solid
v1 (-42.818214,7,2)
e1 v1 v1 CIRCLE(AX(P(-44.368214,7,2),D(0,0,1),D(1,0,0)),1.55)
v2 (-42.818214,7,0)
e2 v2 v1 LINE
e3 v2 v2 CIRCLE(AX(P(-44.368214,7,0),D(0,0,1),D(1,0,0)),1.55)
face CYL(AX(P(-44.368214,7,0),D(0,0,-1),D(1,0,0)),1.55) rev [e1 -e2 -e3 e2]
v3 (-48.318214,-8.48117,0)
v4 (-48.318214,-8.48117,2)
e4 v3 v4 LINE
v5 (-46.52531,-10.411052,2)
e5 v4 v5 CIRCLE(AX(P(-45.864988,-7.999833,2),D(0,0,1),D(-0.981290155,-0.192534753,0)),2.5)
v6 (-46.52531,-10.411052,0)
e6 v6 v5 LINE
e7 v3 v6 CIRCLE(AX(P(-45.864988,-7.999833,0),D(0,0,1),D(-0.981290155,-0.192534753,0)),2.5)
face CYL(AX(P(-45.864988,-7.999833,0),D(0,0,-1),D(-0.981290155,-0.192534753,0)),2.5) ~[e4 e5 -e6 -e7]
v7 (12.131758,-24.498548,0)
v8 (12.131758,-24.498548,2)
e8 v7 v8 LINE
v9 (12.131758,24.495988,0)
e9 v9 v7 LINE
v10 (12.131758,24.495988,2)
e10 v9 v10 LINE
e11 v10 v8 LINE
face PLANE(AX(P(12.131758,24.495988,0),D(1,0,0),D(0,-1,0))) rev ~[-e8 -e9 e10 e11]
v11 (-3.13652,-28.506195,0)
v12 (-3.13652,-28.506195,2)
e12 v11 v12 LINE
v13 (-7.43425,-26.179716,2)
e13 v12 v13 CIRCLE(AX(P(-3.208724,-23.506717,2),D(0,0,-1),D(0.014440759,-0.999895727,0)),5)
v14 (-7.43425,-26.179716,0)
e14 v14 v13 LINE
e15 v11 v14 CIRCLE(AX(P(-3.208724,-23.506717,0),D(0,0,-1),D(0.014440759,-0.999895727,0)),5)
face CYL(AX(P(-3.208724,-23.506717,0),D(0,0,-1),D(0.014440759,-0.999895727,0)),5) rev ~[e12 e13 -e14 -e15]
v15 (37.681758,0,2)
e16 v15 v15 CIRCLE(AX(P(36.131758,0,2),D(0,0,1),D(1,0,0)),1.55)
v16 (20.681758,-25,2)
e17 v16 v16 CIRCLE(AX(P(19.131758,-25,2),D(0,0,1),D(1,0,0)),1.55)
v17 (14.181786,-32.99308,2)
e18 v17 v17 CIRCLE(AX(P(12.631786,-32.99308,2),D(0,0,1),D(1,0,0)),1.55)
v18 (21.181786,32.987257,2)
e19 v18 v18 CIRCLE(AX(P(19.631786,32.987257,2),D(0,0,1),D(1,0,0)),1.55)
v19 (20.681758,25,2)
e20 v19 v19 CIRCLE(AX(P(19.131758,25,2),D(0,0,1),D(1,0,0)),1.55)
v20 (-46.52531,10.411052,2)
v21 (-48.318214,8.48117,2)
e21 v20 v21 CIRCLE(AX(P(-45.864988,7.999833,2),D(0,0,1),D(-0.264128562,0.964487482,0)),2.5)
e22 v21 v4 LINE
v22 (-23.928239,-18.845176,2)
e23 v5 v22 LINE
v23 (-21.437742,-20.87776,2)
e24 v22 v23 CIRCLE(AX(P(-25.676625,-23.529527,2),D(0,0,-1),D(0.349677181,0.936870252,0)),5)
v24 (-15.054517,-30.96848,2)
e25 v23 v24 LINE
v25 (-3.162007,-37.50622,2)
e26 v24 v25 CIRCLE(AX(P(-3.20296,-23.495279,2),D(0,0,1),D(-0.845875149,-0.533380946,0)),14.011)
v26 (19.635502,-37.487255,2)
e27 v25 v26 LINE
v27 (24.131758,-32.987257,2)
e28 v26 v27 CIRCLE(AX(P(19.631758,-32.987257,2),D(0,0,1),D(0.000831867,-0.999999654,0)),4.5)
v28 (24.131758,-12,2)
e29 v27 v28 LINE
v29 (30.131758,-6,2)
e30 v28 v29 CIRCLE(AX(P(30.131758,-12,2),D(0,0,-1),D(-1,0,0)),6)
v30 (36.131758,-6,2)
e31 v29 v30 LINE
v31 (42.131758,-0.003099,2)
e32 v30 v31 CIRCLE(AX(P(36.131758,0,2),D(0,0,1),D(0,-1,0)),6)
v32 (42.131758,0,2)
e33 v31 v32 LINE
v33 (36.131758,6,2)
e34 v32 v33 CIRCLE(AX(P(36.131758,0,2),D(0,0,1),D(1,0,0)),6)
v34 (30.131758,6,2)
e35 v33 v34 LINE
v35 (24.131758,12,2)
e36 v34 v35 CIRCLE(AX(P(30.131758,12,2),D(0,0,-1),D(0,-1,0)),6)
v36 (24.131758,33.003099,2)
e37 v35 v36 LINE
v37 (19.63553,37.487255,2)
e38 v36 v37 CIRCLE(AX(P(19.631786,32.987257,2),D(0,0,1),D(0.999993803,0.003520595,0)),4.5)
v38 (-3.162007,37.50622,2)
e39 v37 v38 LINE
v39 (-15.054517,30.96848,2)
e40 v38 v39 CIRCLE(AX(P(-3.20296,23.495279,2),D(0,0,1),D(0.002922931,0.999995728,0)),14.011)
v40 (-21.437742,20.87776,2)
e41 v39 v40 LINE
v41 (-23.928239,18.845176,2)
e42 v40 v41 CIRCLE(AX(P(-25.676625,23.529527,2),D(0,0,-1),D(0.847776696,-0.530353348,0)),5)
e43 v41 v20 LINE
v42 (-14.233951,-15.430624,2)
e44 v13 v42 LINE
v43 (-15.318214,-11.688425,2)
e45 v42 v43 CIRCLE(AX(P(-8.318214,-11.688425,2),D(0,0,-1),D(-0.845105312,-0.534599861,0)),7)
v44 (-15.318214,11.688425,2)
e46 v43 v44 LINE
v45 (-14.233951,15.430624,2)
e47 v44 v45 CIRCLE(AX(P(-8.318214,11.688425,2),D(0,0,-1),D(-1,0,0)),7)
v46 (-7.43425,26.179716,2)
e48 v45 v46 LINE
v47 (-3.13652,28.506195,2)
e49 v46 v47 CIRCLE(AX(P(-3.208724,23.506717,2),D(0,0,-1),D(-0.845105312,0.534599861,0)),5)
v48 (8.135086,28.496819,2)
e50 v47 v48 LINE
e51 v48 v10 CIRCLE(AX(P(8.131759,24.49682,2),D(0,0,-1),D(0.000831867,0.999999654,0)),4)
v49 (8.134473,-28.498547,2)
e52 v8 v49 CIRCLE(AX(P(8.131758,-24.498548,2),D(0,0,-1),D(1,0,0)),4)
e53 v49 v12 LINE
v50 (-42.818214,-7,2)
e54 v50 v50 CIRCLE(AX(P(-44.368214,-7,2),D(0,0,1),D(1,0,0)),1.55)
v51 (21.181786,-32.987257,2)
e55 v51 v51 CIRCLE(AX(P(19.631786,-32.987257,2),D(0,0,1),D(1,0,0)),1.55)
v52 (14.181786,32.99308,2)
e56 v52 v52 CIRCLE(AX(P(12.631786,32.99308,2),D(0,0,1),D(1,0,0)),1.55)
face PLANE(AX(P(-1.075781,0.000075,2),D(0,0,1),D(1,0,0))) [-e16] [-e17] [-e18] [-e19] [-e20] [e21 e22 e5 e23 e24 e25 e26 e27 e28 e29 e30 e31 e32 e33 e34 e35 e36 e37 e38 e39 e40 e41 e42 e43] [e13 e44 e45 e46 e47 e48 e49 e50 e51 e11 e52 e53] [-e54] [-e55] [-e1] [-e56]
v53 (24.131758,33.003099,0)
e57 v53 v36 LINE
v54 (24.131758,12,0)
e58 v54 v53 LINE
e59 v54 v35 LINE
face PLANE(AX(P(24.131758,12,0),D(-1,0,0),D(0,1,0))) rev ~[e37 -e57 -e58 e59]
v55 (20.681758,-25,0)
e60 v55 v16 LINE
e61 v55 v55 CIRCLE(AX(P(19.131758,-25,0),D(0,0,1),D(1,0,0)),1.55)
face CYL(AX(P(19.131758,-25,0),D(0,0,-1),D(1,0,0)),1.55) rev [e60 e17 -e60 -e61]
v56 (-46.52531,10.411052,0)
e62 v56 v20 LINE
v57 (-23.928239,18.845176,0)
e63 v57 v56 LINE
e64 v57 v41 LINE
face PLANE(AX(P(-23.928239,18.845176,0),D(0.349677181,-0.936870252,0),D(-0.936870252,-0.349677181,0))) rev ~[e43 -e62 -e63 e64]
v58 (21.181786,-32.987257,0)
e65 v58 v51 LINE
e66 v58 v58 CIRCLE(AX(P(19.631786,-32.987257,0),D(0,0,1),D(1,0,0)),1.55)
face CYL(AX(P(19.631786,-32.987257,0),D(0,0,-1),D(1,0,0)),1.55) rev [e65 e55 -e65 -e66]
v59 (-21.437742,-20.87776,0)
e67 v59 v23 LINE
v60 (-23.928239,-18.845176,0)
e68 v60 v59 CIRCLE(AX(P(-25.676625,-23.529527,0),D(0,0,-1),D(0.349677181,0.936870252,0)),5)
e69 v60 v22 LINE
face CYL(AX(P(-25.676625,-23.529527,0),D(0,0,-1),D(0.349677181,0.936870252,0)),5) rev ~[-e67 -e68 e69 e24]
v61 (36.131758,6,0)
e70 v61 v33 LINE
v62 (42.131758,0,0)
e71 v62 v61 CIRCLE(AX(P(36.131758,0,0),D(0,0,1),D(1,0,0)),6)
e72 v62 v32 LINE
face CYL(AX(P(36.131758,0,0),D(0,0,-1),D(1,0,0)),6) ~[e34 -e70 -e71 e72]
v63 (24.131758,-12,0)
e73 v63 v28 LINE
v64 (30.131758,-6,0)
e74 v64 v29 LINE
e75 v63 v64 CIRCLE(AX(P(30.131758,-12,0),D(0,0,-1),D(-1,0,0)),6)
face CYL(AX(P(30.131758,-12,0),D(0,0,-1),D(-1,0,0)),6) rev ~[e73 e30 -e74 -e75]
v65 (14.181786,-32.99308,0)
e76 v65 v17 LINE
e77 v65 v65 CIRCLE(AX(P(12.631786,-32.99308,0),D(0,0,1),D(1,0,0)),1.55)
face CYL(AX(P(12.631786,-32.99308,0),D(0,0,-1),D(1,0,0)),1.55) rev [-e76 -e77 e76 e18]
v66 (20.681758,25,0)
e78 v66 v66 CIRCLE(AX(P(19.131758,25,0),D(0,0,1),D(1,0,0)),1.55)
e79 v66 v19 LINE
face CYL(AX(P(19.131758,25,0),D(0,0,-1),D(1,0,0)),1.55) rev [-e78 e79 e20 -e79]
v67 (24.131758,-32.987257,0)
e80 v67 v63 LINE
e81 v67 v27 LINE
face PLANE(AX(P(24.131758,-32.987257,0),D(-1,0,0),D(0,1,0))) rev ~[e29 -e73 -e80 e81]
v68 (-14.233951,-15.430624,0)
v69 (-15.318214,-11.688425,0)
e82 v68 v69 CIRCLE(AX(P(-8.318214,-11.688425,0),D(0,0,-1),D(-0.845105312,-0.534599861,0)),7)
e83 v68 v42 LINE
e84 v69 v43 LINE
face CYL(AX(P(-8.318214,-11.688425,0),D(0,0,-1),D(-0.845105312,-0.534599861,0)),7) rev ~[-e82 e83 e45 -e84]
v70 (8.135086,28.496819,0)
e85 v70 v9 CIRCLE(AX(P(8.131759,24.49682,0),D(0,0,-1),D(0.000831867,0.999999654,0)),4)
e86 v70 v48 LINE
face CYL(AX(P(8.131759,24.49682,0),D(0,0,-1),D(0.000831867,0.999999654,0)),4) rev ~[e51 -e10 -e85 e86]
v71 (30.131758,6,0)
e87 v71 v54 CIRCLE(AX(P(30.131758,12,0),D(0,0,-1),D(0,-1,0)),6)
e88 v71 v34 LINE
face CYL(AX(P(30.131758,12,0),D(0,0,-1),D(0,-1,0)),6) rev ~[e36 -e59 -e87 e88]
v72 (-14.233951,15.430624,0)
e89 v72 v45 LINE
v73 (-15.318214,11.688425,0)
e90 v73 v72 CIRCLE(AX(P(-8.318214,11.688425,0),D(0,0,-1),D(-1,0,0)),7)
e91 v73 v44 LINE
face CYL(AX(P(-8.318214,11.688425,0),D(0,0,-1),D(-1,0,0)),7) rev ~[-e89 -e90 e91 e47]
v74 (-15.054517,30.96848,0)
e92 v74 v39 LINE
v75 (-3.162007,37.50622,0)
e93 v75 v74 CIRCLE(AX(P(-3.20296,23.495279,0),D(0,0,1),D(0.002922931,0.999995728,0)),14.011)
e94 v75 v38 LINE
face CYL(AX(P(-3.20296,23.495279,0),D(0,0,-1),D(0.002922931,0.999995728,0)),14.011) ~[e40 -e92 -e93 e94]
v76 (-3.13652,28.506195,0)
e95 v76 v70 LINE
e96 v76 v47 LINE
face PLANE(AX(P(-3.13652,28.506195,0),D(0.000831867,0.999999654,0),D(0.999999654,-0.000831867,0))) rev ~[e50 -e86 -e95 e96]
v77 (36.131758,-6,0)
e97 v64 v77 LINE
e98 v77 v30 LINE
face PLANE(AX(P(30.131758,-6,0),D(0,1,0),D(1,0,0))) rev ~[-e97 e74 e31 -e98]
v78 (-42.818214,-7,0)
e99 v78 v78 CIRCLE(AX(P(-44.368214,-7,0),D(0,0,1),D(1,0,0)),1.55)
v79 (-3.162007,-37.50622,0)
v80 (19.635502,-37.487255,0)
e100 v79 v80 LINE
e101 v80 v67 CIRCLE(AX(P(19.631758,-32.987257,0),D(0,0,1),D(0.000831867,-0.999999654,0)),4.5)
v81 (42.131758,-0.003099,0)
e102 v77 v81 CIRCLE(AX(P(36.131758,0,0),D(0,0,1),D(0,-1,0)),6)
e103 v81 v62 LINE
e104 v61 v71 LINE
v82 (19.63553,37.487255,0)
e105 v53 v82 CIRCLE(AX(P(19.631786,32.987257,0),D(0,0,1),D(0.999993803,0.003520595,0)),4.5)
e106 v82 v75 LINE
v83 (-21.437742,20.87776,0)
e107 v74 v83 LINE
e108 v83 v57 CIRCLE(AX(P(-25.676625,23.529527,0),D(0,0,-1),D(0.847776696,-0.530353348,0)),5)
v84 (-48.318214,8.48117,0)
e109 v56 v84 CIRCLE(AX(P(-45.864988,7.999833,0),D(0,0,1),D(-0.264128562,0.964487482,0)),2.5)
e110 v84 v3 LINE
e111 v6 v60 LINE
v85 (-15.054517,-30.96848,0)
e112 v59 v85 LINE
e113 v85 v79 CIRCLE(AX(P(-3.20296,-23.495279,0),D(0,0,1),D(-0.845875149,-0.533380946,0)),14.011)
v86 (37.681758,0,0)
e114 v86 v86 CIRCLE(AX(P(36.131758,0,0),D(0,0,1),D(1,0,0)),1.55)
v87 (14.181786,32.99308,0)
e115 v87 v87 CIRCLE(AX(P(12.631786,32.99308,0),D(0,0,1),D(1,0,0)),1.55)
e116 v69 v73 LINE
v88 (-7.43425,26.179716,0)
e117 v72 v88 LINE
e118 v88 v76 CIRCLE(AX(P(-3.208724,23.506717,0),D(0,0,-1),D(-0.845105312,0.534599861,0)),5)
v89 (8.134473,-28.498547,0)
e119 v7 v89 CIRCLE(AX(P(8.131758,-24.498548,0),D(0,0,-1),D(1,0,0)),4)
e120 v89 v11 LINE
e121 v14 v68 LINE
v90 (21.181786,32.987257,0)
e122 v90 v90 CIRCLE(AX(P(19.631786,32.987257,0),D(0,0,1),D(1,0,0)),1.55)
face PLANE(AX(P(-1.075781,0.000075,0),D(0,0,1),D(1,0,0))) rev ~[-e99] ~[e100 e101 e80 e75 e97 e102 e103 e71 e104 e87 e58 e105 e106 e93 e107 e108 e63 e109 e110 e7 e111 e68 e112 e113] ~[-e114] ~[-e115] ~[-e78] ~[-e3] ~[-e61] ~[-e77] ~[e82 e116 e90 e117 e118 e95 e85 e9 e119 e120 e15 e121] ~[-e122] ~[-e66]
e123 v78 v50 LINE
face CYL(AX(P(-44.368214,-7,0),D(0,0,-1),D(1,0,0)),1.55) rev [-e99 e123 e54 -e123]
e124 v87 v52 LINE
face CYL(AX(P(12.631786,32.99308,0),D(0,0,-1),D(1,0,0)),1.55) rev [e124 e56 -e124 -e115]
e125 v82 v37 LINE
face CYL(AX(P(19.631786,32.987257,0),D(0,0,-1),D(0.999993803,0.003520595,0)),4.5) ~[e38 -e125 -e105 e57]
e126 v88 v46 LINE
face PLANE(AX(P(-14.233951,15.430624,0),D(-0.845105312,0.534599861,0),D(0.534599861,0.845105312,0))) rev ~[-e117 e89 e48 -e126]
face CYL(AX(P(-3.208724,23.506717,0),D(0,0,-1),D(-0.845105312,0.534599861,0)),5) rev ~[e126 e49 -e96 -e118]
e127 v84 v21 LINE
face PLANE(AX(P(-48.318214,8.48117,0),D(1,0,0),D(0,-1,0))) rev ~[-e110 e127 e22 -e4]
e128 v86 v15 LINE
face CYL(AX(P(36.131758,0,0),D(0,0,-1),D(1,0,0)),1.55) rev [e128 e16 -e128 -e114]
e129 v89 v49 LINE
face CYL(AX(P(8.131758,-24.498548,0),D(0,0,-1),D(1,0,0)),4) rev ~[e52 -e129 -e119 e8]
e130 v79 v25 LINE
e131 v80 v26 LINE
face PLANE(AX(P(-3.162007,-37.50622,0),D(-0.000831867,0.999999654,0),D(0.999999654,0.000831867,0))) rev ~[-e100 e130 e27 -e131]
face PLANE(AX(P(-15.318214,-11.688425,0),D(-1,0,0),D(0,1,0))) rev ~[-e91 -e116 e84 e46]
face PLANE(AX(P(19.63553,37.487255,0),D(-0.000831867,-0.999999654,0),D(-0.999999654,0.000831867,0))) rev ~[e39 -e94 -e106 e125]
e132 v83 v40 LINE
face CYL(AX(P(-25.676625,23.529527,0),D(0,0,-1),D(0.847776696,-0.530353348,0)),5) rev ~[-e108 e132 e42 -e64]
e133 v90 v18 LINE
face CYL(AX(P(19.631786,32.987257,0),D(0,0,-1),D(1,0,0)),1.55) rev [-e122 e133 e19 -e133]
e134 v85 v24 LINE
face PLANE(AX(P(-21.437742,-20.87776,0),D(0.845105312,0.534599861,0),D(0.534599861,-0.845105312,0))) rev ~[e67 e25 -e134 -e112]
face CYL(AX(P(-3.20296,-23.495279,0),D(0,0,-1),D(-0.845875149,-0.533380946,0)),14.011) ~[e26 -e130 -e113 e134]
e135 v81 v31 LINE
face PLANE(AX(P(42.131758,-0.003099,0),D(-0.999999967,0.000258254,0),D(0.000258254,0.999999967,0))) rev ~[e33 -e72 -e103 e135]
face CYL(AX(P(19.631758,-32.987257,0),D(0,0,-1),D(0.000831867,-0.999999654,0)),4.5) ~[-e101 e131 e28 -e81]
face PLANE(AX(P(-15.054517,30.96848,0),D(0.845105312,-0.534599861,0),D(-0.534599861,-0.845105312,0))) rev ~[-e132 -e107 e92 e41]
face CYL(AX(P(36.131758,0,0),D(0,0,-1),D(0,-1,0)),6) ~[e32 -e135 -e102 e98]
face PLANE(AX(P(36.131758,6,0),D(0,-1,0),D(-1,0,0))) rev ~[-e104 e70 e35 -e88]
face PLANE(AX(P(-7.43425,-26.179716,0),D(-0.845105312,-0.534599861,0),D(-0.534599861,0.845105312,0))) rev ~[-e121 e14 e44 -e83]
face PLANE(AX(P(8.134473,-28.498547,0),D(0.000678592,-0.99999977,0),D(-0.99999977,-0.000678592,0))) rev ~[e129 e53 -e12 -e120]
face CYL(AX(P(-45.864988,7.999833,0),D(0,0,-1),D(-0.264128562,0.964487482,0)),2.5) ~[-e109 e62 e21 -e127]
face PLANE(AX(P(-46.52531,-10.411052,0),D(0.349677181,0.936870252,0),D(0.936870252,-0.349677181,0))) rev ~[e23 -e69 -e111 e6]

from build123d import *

# Parameters (mm, degrees)
F0_R     = 1.55
F1_DEPTH = 2


# Not quite as in the source:
# - ends of sketch curves that miss each other by under 0.0002 mm in the source are joined


with BuildPart() as f1:
    # F0 (on Top) → F1 (new body)
    with BuildSketch(Plane.XY):
        with BuildLine():
            Line((24.1317584196, 12.0030992724), (24.1317584196, 33.0030992724))
            ThreePointArc((24.1317584196, 33.0030992724), (22.8094861976, 36.1735119864), (19.6355297082, 37.4872550396))
            Line((19.6355297082, 37.4872550396), (-3.1620066842, 37.5062195601))
            ThreePointArc((-3.1620066842, 37.5062195601), (-9.952633868, 35.7733094648), (-15.054516581, 30.9684798394))
            Line((-15.054516581, 30.9684798394), (-21.4377415602, 20.8777601542))
            ThreePointArc((-21.4377415602, 20.8777601542), (-22.515185711, 19.6558592058), (-23.9282391339, 18.8451756363))
            Line((-23.9282391339, 18.8451756363), (-46.5253097099, 10.4110515716))
            ThreePointArc((-46.5253097099, 10.4110515716), (-47.6965598622, 9.7014043841), (-48.3182136925, 8.4811697487))
            Line((-48.3182136925, 8.4811697487), (-48.3182136925, -8.4811697487))
            ThreePointArc((-48.3182136925, -8.4811697487), (-47.6965598622, -9.7014043841), (-46.5253097099, -10.4110515716))
            Line((-46.5253097099, -10.4110515716), (-23.9282391339, -18.8451756363))
            ThreePointArc((-23.9282391339, -18.8451756363), (-22.515185711, -19.6558592058), (-21.4377415602, -20.8777601542))
            Line((-21.4377415602, -20.8777601542), (-15.054516581, -30.9684798394))
            ThreePointArc((-15.054516581, -30.9684798394), (-9.952633868, -35.7733094648), (-3.1620066842, -37.5062195601))
            Line((-3.1620066842, -37.5062195601), (19.6355018203, -37.4872550628))
            ThreePointArc((19.6355018203, -37.4872550628), (22.8150621518, -36.1679133678), (24.1317584196, -32.9872566198))
            Line((24.1317584196, -32.9872566198), (24.1317584196, -12.0030992724))
            Line((24.1317584196, -12.0030992724), (24.1317584196, -12))
            ThreePointArc((24.1317584196, -12), (25.8891177325, -7.7573593129), (30.1317584196, -6))
            Line((30.1317584196, -6), (36.1317584196, -6))
            ThreePointArc((36.1317584196, -6), (40.3733032071, -4.2437363038), (42.1317576192, -0.003099272))
            Line((42.1317576192, -0.003099272), (42.1317584196, 0))
            ThreePointArc((42.1317584196, 0), (40.3743991067, 4.2426406871), (36.1317584196, 6))
            Line((36.1317584196, 6), (30.1317584196, 6))
            ThreePointArc((30.1317584196, 6), (25.8891177325, 7.7573593129), (24.1317584196, 12))
            Line((24.1317584196, 12), (24.1317584196, 12.0030992724))
        make_face()
        with Locations((-44.3682136925, -7)):
            Circle(F0_R, mode=Mode.SUBTRACT)
        with Locations((12.6317863075, -32.9930796663)):
            Circle(F0_R, mode=Mode.SUBTRACT)
        with Locations((19.1317584196, -25)):
            Circle(F0_R, mode=Mode.SUBTRACT)
        with Locations((19.6317863075, -32.9872565966)):
            Circle(F0_R, mode=Mode.SUBTRACT)
        with Locations((-44.3682136925, 7)):
            Circle(F0_R, mode=Mode.SUBTRACT)
        with BuildLine():
            Line((-14.2339508783, 15.4306240067), (-7.4342503505, 26.1797159146))
            ThreePointArc((-7.4342503505, 26.1797159146), (-5.5889861734, 27.9038009834), (-3.1365199939, 28.5061952445))
            Line((-3.1365199939, 28.5061952445), (8.1350859734, 28.4968187664))
            ThreePointArc((8.1350859734, 28.4968187664), (10.9616557954, 27.323776346), (12.1317584196, 24.4959882833))
            Line((12.1317584196, 24.4959882833), (12.1317584196, -24.4985477622))
            ThreePointArc((12.1317584196, -24.4985477622), (10.9611450551, -27.3260150506), (8.1344727862, -28.4985468413))
            Line((8.1344727862, -28.4985468413), (-3.1365199939, -28.5061952445))
            ThreePointArc((-3.1365199939, -28.5061952445), (-5.5889861734, -27.9038009834), (-7.4342503505, -26.1797159146))
            Line((-7.4342503505, -26.1797159146), (-14.2339508783, -15.4306240067))
            ThreePointArc((-14.2339508783, -15.4306240067), (-15.0416860208, -13.6364803831), (-15.3182136925, -11.688424981))
            Line((-15.3182136925, -11.688424981), (-15.3182136925, 11.688424981))
            ThreePointArc((-15.3182136925, 11.688424981), (-15.0416860208, 13.6364803831), (-14.2339508783, 15.4306240067))
        make_face(mode=Mode.SUBTRACT)
        with Locations((36.1317584196, 0)):
            Circle(F0_R, mode=Mode.SUBTRACT)
        with Locations((19.1317584196, 25)):
            Circle(F0_R, mode=Mode.SUBTRACT)
        with Locations((12.6317863075, 32.9930796663)):
            Circle(F0_R, mode=Mode.SUBTRACT)
        with Locations((19.6317863075, 32.9872565966)):
            Circle(F0_R, mode=Mode.SUBTRACT)
    extrude(amount=F1_DEPTH)


solid = f1.part
